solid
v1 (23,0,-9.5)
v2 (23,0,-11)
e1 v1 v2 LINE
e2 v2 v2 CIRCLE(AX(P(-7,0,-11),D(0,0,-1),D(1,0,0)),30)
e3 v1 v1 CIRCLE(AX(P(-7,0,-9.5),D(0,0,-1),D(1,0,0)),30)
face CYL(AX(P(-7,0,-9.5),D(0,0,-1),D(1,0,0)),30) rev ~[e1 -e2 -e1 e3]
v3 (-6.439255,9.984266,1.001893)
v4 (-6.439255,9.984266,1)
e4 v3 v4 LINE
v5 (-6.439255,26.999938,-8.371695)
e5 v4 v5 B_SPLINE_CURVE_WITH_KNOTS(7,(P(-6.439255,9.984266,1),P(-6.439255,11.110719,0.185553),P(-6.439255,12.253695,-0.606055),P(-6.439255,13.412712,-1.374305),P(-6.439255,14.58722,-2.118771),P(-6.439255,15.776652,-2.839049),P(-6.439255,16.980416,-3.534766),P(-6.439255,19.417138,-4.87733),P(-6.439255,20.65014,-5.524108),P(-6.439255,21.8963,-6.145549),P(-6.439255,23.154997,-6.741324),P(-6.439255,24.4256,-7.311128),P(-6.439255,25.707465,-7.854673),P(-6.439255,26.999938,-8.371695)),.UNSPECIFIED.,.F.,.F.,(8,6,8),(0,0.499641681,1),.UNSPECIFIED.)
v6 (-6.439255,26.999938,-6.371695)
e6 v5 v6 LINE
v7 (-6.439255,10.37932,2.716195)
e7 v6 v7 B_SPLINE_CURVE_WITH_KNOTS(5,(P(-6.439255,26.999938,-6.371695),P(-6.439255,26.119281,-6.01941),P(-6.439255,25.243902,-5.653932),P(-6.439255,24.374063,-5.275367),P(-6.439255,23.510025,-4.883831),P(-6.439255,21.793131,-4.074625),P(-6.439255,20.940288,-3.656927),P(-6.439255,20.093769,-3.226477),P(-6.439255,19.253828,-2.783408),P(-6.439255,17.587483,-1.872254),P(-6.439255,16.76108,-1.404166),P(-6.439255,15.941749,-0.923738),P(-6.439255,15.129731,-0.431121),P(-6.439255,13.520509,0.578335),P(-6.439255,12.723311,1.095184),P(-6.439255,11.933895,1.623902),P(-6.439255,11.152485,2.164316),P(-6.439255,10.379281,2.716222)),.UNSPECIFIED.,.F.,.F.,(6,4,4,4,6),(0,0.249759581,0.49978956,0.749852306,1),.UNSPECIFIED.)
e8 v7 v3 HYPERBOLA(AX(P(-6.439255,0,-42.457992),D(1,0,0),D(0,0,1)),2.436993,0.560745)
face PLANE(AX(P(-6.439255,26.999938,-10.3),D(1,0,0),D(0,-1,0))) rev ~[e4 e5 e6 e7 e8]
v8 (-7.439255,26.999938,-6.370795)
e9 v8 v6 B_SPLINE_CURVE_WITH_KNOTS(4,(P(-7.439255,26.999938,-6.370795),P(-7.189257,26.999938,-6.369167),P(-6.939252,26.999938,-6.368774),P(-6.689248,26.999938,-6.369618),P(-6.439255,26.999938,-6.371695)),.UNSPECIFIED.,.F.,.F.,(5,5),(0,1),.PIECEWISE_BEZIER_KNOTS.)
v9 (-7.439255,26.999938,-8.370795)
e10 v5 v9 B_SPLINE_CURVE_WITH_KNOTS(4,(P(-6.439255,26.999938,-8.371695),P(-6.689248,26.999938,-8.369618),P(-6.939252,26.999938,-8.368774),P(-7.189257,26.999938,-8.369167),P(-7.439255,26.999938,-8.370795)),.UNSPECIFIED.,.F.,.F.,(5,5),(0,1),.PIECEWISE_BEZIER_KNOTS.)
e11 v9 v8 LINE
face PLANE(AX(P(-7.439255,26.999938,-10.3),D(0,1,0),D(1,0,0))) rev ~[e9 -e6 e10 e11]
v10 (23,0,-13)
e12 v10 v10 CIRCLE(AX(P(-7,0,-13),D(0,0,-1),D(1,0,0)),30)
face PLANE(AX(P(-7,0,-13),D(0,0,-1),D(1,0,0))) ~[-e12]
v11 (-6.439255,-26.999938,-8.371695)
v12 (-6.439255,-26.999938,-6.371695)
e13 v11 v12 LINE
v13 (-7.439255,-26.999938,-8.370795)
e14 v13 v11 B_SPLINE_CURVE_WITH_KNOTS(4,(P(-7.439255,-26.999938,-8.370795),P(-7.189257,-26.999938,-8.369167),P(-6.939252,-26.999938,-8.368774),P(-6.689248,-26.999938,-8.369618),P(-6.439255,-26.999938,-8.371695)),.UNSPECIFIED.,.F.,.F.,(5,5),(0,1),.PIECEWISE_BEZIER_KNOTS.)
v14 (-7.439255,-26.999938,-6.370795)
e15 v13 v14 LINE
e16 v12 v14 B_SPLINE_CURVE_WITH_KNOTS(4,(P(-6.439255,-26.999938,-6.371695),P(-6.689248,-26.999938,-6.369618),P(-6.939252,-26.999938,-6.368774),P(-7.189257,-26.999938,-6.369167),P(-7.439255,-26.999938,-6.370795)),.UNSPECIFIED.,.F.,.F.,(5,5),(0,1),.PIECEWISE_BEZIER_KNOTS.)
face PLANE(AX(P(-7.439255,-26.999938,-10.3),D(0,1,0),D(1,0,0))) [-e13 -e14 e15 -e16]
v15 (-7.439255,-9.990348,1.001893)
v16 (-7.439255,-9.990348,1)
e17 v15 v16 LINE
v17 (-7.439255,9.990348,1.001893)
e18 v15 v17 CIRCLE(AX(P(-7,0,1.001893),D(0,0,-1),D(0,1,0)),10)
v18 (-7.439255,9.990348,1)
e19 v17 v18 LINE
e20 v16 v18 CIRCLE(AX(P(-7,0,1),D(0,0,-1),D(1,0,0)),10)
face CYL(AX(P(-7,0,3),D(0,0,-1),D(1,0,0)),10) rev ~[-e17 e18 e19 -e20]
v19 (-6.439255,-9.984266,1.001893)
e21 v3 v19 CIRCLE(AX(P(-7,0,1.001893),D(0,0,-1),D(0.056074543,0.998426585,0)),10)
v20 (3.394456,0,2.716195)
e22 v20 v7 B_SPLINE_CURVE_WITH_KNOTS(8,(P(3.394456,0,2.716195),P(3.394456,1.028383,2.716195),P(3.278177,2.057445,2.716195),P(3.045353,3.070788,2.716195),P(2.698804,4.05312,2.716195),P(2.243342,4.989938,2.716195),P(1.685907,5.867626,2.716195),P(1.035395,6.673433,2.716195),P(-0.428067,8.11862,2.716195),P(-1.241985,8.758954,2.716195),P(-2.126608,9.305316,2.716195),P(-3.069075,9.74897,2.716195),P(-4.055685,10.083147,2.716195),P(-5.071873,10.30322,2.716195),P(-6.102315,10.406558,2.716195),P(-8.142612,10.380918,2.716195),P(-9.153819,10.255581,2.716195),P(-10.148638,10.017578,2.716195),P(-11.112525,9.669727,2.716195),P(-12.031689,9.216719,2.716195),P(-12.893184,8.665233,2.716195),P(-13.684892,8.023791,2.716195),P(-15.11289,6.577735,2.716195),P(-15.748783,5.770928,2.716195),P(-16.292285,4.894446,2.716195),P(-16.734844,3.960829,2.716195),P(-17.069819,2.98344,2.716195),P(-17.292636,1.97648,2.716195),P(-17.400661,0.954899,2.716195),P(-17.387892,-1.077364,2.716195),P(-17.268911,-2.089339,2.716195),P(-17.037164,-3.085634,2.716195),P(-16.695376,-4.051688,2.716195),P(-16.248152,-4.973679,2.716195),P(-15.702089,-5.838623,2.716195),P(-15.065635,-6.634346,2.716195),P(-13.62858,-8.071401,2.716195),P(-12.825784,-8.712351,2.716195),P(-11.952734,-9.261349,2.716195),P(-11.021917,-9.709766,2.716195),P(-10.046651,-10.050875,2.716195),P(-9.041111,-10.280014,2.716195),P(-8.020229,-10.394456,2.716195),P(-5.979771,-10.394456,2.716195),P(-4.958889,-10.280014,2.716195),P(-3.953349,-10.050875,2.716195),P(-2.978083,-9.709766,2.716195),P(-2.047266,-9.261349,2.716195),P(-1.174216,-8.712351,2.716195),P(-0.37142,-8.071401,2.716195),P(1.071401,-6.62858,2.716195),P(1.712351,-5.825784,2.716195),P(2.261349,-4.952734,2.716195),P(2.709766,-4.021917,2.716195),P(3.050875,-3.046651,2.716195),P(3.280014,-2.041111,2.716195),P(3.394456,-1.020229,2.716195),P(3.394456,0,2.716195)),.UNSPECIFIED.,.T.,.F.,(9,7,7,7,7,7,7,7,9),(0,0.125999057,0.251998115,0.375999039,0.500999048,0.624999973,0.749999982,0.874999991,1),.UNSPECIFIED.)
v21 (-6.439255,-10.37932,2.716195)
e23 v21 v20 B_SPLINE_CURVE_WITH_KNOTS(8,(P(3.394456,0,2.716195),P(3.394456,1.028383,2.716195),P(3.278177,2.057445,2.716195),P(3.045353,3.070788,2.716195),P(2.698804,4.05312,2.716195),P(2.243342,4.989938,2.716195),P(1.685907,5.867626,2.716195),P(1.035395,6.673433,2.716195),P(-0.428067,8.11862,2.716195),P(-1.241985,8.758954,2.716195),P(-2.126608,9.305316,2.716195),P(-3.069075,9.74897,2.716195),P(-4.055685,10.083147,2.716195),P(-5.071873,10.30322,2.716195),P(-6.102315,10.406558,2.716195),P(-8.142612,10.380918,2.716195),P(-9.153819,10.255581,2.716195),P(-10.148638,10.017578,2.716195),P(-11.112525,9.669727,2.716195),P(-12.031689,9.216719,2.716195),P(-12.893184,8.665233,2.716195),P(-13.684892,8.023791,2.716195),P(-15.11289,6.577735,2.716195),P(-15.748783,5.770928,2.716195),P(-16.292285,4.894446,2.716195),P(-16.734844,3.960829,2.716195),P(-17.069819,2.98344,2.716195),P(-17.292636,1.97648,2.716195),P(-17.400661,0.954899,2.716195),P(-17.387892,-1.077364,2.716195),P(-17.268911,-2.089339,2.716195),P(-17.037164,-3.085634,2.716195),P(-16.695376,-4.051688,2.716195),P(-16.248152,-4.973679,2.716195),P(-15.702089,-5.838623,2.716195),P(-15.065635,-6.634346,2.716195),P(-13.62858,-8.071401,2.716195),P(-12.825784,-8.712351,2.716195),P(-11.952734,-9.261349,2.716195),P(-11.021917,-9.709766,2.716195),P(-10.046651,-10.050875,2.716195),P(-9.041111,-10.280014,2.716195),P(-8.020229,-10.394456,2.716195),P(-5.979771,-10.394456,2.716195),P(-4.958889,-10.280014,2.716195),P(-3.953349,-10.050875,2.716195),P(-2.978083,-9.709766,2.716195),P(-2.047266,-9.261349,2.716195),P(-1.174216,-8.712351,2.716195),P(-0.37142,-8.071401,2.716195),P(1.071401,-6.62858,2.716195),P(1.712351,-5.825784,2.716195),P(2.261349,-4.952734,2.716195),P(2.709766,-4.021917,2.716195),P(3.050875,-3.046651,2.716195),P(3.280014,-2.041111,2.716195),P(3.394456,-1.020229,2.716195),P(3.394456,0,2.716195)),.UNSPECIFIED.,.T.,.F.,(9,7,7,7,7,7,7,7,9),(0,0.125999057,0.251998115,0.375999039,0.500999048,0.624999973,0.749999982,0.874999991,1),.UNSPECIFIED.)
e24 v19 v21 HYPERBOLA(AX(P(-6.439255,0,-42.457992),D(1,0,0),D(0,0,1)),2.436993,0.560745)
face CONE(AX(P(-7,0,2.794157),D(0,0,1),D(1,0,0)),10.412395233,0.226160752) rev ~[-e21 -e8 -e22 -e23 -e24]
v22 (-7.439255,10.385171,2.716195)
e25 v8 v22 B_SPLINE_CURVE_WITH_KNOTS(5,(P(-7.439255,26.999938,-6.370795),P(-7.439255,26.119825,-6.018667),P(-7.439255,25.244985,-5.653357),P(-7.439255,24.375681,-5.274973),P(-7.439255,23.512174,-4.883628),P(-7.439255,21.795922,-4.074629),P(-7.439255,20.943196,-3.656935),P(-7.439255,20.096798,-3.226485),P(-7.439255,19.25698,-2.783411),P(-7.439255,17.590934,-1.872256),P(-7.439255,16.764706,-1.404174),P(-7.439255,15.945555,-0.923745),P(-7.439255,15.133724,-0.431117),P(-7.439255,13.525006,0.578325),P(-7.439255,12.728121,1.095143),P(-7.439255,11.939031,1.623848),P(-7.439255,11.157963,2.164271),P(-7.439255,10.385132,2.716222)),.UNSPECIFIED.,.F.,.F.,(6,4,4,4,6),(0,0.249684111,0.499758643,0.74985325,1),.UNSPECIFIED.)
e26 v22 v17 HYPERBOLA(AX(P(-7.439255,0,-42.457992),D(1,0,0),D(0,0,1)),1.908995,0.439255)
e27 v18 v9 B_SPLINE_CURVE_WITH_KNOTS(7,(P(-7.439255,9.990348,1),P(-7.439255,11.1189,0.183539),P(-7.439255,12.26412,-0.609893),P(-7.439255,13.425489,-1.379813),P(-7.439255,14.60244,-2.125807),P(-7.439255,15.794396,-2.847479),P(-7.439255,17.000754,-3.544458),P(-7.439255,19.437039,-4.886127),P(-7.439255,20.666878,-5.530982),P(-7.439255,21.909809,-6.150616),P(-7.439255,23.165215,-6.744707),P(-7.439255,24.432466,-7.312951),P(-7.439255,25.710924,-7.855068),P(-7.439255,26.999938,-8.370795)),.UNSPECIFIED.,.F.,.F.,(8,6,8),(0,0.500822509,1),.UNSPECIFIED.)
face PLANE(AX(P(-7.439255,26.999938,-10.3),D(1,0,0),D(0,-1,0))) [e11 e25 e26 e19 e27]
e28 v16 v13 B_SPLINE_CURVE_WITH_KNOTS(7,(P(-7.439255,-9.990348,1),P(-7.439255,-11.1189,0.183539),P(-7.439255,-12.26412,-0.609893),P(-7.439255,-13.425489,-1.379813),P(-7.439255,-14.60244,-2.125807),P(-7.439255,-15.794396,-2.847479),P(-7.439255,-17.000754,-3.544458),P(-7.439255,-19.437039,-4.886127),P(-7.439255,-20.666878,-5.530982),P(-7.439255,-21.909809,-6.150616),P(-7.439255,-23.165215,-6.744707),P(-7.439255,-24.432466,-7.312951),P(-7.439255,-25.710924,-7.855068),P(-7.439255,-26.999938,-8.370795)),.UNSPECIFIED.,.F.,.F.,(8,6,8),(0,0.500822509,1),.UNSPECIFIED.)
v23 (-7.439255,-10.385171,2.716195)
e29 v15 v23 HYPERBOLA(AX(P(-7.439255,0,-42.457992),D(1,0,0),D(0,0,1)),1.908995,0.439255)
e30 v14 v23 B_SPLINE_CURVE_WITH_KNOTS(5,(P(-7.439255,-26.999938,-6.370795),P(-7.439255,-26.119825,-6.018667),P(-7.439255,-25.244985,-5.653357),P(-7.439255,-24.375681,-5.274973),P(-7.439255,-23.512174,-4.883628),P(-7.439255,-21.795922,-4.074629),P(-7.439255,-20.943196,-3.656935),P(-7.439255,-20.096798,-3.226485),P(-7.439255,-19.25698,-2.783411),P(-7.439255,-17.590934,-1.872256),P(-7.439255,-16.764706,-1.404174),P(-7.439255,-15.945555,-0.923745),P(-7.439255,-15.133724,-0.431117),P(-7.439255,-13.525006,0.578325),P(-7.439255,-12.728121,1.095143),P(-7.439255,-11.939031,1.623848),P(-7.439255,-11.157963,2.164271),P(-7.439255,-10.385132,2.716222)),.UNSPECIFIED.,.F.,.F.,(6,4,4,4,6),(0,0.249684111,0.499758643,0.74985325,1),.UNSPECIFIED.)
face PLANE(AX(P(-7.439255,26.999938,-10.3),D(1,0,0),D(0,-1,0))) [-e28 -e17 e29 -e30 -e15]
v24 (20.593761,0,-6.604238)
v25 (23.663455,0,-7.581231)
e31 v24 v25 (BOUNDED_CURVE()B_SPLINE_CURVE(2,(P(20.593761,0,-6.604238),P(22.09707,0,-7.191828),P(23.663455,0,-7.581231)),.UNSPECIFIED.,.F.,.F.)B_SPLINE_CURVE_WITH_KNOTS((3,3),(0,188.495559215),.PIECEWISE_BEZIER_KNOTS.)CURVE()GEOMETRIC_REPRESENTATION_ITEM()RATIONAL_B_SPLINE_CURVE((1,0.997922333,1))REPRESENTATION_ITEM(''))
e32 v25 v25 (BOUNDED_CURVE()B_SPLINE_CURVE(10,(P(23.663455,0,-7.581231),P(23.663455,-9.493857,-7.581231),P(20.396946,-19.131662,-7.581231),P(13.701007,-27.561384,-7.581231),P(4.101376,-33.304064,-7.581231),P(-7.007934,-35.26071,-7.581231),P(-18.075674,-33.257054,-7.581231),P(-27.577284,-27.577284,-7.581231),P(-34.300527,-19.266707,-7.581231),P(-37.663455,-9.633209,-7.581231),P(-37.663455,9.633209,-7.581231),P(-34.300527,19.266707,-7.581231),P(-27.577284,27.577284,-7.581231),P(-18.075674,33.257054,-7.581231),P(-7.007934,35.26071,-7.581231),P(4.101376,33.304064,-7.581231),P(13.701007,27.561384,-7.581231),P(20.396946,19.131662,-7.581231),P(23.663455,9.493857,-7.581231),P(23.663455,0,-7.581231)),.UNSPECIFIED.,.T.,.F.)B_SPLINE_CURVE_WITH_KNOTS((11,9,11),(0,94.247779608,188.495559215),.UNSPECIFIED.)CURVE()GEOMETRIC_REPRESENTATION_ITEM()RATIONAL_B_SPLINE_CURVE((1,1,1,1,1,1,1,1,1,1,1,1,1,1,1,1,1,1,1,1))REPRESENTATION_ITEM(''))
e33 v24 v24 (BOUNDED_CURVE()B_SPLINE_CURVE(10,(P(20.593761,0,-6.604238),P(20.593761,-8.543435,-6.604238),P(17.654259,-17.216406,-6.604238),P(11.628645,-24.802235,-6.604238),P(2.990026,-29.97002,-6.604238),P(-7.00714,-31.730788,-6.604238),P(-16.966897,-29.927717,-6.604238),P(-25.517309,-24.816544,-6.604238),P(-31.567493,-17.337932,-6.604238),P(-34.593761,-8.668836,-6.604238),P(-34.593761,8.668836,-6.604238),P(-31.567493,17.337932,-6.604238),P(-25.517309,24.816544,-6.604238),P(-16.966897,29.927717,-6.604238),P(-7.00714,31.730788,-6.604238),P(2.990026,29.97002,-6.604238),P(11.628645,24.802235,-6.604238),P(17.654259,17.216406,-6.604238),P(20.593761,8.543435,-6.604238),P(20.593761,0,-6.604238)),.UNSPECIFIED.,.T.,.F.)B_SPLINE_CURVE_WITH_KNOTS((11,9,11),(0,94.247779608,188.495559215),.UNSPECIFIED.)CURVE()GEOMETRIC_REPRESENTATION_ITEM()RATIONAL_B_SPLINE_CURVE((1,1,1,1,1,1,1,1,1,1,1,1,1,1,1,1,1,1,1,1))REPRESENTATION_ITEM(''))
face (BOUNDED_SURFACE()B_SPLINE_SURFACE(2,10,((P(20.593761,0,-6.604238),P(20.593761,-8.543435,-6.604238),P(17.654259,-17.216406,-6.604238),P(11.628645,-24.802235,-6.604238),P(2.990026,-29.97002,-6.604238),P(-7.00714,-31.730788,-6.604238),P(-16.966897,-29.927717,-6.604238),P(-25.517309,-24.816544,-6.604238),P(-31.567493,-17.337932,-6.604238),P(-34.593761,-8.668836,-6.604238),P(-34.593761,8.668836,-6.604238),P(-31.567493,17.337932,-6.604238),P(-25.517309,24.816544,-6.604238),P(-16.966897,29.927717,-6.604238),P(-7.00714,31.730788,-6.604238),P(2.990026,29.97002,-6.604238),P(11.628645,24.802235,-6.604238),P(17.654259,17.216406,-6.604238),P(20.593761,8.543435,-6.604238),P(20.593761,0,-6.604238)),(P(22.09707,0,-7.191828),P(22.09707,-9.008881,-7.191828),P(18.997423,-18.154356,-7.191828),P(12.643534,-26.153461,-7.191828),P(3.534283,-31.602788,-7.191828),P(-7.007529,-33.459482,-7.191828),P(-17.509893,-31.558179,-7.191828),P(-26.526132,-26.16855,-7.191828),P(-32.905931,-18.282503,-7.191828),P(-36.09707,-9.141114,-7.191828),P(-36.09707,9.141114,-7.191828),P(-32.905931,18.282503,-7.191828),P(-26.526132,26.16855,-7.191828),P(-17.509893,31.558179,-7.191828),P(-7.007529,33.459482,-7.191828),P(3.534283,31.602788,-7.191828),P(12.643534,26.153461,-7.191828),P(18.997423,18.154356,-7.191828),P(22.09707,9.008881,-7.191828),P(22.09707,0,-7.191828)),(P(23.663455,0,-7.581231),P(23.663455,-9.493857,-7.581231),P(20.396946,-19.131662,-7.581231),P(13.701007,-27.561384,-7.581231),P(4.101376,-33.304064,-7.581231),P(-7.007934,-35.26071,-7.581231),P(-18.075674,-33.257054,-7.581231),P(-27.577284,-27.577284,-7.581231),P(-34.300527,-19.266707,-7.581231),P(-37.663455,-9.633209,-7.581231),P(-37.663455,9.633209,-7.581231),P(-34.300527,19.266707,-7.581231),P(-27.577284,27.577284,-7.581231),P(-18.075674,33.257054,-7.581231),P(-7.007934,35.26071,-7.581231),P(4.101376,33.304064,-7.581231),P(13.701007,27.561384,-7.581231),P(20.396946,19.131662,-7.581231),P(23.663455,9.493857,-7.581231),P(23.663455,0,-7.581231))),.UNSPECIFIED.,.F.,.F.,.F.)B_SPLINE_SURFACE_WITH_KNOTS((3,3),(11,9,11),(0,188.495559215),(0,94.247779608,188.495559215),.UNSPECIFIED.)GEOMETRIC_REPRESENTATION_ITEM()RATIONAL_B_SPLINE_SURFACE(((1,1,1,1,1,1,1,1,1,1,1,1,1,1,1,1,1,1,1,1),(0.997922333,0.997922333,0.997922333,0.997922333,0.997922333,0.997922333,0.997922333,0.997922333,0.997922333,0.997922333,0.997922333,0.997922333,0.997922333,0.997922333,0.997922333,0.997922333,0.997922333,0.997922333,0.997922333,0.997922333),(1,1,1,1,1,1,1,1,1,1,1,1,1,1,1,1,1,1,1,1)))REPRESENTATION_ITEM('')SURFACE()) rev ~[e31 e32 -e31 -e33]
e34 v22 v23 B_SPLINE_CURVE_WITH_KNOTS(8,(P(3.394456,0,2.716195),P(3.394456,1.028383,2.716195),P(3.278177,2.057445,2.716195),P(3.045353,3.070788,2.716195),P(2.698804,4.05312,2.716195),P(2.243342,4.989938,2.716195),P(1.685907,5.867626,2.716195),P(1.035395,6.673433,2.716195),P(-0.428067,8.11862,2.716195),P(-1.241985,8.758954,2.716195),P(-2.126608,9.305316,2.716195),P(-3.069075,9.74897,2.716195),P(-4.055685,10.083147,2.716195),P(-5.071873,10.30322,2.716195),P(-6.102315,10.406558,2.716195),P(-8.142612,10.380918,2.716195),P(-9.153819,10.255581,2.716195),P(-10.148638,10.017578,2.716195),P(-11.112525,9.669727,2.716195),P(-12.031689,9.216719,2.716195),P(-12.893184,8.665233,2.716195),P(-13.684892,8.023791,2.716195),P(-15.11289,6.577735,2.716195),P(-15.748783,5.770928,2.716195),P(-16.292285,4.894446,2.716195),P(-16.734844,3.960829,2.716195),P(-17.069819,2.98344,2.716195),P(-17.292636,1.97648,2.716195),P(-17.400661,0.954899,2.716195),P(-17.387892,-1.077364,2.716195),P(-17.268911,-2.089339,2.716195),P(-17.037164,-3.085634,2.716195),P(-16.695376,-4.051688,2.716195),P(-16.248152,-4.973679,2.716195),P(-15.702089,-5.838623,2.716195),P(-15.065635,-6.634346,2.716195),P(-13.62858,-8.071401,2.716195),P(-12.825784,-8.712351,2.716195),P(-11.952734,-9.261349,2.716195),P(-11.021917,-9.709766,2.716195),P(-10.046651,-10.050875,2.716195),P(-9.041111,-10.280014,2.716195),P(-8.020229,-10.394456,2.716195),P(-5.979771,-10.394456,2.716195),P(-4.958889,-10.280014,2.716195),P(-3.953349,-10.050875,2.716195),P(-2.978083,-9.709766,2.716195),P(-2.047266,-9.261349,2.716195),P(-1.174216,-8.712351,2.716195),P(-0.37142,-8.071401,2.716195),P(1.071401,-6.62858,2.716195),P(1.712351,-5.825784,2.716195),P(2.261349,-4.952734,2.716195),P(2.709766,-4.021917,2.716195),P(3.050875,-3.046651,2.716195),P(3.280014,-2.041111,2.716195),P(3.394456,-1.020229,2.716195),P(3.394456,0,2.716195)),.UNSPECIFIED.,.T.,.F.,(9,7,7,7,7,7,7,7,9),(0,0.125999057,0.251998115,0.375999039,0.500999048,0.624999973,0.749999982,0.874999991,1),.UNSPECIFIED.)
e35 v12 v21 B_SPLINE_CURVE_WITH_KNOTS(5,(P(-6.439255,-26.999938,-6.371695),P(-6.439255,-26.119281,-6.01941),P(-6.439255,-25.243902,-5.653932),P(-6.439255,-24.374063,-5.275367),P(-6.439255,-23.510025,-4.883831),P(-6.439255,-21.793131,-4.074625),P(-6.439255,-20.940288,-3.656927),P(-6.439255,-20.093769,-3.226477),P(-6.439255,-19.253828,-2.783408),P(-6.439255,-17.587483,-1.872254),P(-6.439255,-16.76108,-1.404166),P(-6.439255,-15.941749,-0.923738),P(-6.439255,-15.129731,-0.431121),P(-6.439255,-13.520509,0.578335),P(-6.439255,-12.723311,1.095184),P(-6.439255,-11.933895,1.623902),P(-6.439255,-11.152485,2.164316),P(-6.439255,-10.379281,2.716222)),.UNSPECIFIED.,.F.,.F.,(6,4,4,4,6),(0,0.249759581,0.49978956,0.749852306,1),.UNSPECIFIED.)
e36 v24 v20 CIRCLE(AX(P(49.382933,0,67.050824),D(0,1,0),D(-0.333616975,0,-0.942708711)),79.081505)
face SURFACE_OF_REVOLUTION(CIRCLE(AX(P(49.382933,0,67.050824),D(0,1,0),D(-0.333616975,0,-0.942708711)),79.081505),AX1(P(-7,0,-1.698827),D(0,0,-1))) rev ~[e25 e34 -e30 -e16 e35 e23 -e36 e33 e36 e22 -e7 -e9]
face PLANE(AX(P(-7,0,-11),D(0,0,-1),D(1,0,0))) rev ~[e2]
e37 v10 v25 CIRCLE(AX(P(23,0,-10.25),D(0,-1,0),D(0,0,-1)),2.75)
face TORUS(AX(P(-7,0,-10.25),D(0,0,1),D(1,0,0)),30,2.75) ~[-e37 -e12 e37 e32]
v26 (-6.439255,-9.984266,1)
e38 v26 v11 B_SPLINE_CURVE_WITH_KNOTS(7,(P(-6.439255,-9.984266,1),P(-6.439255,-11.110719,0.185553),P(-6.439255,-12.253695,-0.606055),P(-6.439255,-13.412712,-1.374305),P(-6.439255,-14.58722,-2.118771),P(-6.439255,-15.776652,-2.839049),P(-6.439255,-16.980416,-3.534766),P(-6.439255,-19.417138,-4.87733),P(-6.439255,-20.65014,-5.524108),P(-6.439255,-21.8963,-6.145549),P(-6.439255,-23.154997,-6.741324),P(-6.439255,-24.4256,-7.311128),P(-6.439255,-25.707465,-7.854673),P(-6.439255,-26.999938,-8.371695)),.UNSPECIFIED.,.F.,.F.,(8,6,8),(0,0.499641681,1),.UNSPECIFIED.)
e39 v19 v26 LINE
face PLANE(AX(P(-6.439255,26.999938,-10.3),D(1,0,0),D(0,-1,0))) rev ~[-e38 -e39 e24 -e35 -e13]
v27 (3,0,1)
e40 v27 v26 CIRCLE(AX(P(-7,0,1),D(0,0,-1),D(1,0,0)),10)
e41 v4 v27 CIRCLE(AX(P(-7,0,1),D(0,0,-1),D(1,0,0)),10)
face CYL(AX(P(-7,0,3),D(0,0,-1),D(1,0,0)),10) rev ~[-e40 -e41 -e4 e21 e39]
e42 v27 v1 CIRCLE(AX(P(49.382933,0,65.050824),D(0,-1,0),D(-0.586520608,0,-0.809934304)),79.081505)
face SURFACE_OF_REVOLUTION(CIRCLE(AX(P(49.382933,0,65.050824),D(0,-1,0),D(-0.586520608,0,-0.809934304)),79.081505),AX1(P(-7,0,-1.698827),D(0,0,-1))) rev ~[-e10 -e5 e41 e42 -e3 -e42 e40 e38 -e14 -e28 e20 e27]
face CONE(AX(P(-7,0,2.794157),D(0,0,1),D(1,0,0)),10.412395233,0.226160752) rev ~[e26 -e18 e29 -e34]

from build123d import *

# Parameters (mm, degrees)
F3_R     = 25
F5_START = -2.7
F4_W     = 1
F4_H     = 53.9998769996
F5_DEPTH = 22.3


# Not quite as in the source:
# - a fillet or chamfer that OpenCascade refuses, or shapes differently, is made with other operations: its cross-section is extruded or revolved along the edge and cut away or added


with BuildPart() as f1:
    # F0 (on Front) → F1 (revolve)
    with BuildSketch(Plane.XZ):
        with BuildLine():
            ThreePointArc((3, 1), (12.6231681205, -4.9677750086), (23, -9.5))
            Line((23, -9.5), (23, -11))
            Line((23, -11), (-7, -11))
            Line((-7, -11), (-7, -13))
            Line((-7, -13), (23, -13))
            ThreePointArc((23, -13), (25.75, -10.25), (23, -7.5))
            ThreePointArc((23, -7.5), (12.6231681205, -2.9677750086), (3, 3))
            Line((3, 3), (3, 1))
        make_face()
    revolve(axis=Axis((-7, 0, -1.698827371), (0, 0, -1)))

    # F2: chamfer of 0.5 x 2 on 1 edges, made by hand

    # F2_s1 → F2_t2 (revolve, cut)
    with BuildSketch(Plane.XZ):
        with BuildLine():
            Line((3.4123952329, 2.7941574241), (2.9820609835, 0.9239297508))
            Line((2.9820609835, 0.9239297508), (2.9420609835, 0.9239297508))
            ThreePointArc((2.9420609835, 0.9239297508), (2.96, 1.9619648754), (2.96, 3))
            Line((2.96, 3), (3.0234608243, 3.0323973722))
            ThreePointArc((3.0234608243, 3.0323973722), (3.2078025867, 2.8993085114), (3.4356565384, 2.8266983471))
            Line((3.4356565384, 2.8266983471), (3.4123952329, 2.7941574241))
        make_face()
    revolve(axis=Axis((-7, 0, 3), (0, 0, -1)), mode=Mode.SUBTRACT)

    # F3
    f3_edges = [f1.edges().sort_by_distance(p)[0] for p in [
        (-37, 0, -7.5),
    ]]
    fillet(f3_edges, radius=F3_R)

    # F4 (on face) → F5 (cut)
    with BuildSketch(Plane(origin=(0, 0, -13), x_dir=(1, 0, 0), z_dir=(0, 0, -1)).offset(F5_START)):
        with Locations((-6.9392545743, 0)):
            Rectangle(F4_W, F4_H)
    extrude(amount=-F5_DEPTH, mode=Mode.SUBTRACT)


solid = f1.part
